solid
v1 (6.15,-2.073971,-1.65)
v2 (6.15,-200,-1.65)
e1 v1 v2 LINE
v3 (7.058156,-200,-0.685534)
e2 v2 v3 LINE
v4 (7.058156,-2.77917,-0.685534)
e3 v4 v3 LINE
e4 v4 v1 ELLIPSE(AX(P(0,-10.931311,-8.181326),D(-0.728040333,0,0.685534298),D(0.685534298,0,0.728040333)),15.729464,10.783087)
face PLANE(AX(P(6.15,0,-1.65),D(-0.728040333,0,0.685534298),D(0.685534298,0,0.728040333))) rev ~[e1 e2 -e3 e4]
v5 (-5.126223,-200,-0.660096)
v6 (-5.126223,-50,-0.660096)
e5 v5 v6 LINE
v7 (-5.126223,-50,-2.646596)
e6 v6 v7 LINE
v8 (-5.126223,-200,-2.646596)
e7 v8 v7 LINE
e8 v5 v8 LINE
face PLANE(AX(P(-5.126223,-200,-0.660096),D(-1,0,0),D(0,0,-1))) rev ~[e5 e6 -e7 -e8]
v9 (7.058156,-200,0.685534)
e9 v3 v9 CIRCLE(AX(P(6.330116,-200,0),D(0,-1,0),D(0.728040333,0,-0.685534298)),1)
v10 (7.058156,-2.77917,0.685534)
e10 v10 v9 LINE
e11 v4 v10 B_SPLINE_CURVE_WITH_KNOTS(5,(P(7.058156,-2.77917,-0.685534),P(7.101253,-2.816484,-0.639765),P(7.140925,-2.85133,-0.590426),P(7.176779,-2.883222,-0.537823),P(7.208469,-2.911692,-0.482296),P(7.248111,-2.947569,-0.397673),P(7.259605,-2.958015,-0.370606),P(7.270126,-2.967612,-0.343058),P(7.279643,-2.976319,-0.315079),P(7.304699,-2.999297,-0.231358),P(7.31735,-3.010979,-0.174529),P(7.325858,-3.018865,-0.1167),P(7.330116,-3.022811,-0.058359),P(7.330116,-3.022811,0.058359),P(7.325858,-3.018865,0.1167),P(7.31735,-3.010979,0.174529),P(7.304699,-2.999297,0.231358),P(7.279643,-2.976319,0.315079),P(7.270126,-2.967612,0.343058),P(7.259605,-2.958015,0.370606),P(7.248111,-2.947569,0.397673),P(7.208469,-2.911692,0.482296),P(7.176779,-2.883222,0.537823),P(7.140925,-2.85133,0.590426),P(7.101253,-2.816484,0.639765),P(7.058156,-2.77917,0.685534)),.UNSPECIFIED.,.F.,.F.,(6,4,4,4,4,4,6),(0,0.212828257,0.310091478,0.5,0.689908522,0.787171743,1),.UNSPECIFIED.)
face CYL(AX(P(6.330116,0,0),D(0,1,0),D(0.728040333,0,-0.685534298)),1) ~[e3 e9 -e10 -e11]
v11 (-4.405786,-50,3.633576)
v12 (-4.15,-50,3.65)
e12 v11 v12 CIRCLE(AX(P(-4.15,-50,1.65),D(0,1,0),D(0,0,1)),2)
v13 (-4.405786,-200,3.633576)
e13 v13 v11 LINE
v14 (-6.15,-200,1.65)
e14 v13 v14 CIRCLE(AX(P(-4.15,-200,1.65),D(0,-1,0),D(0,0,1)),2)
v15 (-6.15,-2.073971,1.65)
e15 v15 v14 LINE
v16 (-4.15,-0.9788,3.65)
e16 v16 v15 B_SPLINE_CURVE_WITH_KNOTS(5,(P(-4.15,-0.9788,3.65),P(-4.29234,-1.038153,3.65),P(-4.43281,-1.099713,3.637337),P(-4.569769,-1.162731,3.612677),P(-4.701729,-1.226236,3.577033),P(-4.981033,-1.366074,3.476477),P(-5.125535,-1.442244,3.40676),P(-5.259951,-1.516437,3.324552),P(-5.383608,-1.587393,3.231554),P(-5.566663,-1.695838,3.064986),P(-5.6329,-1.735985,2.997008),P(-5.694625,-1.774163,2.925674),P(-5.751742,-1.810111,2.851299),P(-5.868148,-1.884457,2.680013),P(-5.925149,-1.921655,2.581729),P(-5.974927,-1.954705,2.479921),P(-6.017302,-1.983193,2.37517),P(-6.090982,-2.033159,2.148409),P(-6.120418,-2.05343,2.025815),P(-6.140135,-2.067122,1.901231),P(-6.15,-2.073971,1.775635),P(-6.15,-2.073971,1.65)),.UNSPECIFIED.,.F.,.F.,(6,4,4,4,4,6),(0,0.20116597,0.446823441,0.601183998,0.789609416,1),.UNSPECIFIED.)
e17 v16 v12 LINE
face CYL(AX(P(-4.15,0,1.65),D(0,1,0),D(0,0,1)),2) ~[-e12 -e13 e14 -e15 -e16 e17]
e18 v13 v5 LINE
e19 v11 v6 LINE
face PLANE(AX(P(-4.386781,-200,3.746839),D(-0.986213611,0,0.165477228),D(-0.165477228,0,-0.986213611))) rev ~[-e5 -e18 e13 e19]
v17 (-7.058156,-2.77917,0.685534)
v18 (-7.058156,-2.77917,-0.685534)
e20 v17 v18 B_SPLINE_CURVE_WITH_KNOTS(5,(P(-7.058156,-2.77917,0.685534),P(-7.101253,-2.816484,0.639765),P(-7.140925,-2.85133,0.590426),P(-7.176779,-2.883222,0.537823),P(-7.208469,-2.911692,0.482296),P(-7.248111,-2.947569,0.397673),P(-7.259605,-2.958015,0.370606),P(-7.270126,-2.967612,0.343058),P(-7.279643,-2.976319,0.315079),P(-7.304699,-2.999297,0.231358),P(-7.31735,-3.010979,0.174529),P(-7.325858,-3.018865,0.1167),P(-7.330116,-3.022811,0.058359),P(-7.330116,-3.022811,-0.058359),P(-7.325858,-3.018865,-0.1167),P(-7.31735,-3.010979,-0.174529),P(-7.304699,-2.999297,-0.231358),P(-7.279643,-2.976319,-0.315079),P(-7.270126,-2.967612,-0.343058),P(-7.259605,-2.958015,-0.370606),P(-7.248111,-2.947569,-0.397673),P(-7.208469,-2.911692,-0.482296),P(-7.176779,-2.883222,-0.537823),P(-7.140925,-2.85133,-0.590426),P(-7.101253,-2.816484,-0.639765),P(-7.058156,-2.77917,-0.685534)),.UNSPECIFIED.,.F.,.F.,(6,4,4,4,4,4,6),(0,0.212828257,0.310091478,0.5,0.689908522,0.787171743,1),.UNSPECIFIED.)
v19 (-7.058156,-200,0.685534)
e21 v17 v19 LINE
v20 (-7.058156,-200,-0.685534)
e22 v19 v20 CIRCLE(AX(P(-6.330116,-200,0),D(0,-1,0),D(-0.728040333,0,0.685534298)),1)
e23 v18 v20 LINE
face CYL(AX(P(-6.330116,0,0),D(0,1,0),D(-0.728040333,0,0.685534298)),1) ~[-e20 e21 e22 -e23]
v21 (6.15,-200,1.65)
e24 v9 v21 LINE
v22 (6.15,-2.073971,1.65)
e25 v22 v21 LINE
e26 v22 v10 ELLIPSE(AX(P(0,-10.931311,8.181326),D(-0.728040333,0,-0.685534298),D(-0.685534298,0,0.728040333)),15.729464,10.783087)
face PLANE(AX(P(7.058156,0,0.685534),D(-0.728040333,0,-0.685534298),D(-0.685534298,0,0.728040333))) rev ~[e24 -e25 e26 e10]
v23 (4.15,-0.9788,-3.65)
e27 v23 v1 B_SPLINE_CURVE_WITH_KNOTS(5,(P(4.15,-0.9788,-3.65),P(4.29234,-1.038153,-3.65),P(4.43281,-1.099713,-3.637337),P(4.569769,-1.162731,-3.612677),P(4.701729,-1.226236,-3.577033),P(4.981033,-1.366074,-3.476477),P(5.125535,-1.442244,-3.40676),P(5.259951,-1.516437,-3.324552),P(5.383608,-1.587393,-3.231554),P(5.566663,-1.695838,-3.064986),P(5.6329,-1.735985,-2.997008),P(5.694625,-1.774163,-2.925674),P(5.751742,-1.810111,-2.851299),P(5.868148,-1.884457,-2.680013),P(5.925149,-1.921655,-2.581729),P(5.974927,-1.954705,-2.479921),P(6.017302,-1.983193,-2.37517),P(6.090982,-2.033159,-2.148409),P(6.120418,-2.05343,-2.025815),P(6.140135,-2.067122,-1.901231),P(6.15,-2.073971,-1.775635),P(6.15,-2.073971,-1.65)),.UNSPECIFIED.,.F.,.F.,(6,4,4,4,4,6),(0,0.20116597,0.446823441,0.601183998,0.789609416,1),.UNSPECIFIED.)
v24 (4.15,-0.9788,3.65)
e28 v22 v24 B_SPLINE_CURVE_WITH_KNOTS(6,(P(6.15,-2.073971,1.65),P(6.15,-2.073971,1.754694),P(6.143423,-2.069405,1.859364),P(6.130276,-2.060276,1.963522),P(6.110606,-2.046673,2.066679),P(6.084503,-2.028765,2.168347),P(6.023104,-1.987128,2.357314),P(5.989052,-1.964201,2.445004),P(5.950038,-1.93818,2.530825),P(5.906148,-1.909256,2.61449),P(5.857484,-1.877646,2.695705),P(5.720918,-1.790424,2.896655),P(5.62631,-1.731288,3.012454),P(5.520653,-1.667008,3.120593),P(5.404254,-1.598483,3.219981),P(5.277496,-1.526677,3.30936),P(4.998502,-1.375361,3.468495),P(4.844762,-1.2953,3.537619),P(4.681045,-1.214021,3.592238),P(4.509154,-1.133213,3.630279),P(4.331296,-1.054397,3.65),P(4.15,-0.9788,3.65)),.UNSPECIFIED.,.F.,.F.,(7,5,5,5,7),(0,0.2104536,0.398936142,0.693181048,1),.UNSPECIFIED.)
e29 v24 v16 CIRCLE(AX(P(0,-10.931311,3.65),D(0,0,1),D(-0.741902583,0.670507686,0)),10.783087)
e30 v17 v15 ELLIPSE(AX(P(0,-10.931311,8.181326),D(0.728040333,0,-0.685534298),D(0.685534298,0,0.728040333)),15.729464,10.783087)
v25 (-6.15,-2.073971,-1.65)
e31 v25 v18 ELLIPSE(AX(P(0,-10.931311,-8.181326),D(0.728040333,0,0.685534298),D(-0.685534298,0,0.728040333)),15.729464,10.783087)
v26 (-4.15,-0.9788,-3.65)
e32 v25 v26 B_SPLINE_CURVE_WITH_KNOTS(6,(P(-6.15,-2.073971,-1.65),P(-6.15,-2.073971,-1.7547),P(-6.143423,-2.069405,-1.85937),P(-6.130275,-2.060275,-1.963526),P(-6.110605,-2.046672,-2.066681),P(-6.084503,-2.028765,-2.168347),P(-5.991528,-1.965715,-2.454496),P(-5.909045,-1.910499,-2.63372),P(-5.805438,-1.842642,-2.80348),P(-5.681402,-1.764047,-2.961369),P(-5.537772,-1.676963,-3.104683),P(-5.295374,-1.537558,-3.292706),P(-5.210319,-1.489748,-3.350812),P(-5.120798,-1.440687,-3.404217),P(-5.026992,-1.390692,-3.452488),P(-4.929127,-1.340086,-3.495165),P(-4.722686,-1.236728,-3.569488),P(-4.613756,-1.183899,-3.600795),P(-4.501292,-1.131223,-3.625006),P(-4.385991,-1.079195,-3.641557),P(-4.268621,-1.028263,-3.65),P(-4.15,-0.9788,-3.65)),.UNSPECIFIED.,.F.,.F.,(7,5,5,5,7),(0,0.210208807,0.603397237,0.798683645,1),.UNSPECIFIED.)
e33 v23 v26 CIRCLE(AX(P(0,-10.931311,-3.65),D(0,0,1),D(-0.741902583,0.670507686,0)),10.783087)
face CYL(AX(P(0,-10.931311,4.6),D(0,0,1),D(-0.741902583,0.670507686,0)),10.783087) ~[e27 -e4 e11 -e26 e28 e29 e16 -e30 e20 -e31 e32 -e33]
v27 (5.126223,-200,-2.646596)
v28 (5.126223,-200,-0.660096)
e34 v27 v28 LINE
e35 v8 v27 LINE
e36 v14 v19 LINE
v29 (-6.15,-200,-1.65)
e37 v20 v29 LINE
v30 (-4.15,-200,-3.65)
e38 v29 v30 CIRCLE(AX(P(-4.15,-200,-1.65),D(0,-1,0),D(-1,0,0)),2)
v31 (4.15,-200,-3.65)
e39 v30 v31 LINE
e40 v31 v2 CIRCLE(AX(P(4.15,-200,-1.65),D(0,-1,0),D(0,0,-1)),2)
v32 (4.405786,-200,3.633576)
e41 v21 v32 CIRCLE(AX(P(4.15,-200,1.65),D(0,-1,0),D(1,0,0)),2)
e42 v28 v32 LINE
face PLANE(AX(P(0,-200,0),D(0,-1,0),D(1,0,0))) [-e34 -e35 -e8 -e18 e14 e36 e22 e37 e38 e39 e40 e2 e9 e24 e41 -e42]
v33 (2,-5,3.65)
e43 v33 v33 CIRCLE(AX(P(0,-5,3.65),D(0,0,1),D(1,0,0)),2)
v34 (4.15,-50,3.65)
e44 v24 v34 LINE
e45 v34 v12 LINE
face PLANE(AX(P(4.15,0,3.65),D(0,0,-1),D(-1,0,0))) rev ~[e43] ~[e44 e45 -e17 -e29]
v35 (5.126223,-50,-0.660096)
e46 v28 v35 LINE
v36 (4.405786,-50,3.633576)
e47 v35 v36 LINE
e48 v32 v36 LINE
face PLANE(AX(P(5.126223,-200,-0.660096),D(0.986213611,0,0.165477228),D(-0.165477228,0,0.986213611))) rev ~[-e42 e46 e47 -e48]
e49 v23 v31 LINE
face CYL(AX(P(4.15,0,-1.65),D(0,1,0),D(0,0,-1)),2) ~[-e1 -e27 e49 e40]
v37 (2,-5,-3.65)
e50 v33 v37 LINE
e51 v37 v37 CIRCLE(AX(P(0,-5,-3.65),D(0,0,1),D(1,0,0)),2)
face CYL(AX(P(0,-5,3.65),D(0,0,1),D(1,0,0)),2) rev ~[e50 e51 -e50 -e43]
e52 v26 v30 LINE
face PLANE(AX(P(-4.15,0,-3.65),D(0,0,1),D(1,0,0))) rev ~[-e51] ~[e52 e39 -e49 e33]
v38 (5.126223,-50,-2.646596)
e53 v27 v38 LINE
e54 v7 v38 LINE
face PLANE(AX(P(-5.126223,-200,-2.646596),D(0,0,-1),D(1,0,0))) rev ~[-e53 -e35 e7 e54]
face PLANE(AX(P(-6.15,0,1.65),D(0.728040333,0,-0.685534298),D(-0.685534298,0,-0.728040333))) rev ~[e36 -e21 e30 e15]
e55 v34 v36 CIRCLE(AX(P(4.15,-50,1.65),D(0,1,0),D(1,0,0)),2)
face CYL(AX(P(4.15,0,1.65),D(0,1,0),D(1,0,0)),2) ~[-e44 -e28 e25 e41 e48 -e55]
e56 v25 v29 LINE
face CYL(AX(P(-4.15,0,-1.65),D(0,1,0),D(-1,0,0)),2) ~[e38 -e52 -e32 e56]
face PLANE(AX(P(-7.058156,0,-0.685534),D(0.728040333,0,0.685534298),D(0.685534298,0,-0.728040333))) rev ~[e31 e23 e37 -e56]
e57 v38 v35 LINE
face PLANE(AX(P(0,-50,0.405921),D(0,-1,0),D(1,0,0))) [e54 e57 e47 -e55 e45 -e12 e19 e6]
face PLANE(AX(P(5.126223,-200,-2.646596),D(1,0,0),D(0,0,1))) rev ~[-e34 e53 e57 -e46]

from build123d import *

# Parameters (mm, degrees)
F1_DEPTH = 200
F2_R     = 2
F3_DEPTH = 7.301
F6_DEPTH = 25
F9_DEPTH = 150


# Not quite as in the source:
# - a feature names something its author has since deleted; it is built from what else it names


with BuildPart() as f1:
    # F0 (on Front) → F1 (new body)
    with BuildSketch(Plane.XZ):
        with BuildLine():
            Line((7.0581561667, 0.685534298), (6.15, 1.65))
            ThreePointArc((6.15, 1.65), (5.5642135624, 3.0642135624), (4.15, 3.65))
            Line((4.15, 3.65), (-4.15, 3.65))
            ThreePointArc((-4.15, 3.65), (-5.5642135624, 3.0642135624), (-6.15, 1.65))
            Line((-6.15, 1.65), (-7.0581561667, 0.685534298))
            ThreePointArc((-7.0581561667, 0.685534298), (-7.3301158338, 0), (-7.0581561667, -0.685534298))
            Line((-7.0581561667, -0.685534298), (-6.15, -1.65))
            ThreePointArc((-6.15, -1.65), (-5.5642135624, -3.0642135624), (-4.15, -3.65))
            Line((-4.15, -3.65), (4.15, -3.65))
            ThreePointArc((4.15, -3.65), (5.5642135624, -3.0642135624), (6.15, -1.65))
            Line((6.15, -1.65), (7.0581561667, -0.685534298))
            ThreePointArc((7.0581561667, -0.685534298), (7.3301158338, 0), (7.0581561667, 0.685534298))
        make_face()
        with BuildLine():
            ThreePointArc((5.15, -1.65), (4.8571067812, -2.3571067812), (4.15, -2.65))
            Line((4.15, -2.65), (-4.15, -2.65))
            ThreePointArc((-4.15, -2.65), (-4.8571067812, -2.3571067812), (-5.15, -1.65))
            Line((-5.15, -1.65), (-5.15, 1.65))
            ThreePointArc((-5.15, 1.65), (-4.8571067812, 2.3571067812), (-4.15, 2.65))
            Line((-4.15, 2.65), (4.15, 2.65))
            ThreePointArc((4.15, 2.65), (4.8571067812, 2.3571067812), (5.15, 1.65))
            Line((5.15, 1.65), (5.15, -1.65))
        make_face(mode=Mode.SUBTRACT)
        with BuildLine():
            Line((-4.15, -2.65), (4.15, -2.65))
            ThreePointArc((4.15, -2.65), (4.8571067812, -2.3571067812), (5.15, -1.65))
            Line((5.15, -1.65), (5.15, 1.65))
            ThreePointArc((5.15, 1.65), (4.8571067812, 2.3571067812), (4.15, 2.65))
            Line((4.15, 2.65), (-4.15, 2.65))
            ThreePointArc((-4.15, 2.65), (-4.8571067812, 2.3571067812), (-5.15, 1.65))
            Line((-5.15, 1.65), (-5.15, -1.65))
            ThreePointArc((-5.15, -1.65), (-4.8571067812, -2.3571067812), (-4.15, -2.65))
        make_face()
    extrude(amount=F1_DEPTH)

    # F2 (on face) → F3 (cut, through all)
    with BuildSketch(Plane.XY.offset(3.65)):
        with Locations((0, -5)):
            Circle(F2_R)
    extrude(amount=-F3_DEPTH, mode=Mode.SUBTRACT)

    # F5 (on offset) → F6 (cut)
    with BuildSketch(Plane.XY.offset(4.6)):
        with BuildLine():
            Line((8, -3.7011680724), (8, 3.7011680724))
            Line((8, 3.7011680724), (-8, 3.7011680724))
            Line((-8, 3.7011680724), (-8, -3.7011680724))
            ThreePointArc((-8, -3.7011680724), (0, -0.1482238292), (8, -3.7011680724))
        make_face()
    extrude(amount=-F6_DEPTH, mode=Mode.SUBTRACT)

    # F8 (on offset) → F9 (cut)
    with BuildSketch(Plane.XZ.offset(200)):
        Polygon((-5.1262229681, -2.646596171), (0, -2.646596171), (5.1262229681, -2.646596171), (5.1262229681, -0.6600963534), (4.3867812492, 3.7468392402), (0, 3.7468392402), (-4.3867812492, 3.7468392402), (-5.1262229681, -0.6600963534), align=None)
    extrude(amount=-F9_DEPTH, mode=Mode.SUBTRACT)


solid = f1.part
